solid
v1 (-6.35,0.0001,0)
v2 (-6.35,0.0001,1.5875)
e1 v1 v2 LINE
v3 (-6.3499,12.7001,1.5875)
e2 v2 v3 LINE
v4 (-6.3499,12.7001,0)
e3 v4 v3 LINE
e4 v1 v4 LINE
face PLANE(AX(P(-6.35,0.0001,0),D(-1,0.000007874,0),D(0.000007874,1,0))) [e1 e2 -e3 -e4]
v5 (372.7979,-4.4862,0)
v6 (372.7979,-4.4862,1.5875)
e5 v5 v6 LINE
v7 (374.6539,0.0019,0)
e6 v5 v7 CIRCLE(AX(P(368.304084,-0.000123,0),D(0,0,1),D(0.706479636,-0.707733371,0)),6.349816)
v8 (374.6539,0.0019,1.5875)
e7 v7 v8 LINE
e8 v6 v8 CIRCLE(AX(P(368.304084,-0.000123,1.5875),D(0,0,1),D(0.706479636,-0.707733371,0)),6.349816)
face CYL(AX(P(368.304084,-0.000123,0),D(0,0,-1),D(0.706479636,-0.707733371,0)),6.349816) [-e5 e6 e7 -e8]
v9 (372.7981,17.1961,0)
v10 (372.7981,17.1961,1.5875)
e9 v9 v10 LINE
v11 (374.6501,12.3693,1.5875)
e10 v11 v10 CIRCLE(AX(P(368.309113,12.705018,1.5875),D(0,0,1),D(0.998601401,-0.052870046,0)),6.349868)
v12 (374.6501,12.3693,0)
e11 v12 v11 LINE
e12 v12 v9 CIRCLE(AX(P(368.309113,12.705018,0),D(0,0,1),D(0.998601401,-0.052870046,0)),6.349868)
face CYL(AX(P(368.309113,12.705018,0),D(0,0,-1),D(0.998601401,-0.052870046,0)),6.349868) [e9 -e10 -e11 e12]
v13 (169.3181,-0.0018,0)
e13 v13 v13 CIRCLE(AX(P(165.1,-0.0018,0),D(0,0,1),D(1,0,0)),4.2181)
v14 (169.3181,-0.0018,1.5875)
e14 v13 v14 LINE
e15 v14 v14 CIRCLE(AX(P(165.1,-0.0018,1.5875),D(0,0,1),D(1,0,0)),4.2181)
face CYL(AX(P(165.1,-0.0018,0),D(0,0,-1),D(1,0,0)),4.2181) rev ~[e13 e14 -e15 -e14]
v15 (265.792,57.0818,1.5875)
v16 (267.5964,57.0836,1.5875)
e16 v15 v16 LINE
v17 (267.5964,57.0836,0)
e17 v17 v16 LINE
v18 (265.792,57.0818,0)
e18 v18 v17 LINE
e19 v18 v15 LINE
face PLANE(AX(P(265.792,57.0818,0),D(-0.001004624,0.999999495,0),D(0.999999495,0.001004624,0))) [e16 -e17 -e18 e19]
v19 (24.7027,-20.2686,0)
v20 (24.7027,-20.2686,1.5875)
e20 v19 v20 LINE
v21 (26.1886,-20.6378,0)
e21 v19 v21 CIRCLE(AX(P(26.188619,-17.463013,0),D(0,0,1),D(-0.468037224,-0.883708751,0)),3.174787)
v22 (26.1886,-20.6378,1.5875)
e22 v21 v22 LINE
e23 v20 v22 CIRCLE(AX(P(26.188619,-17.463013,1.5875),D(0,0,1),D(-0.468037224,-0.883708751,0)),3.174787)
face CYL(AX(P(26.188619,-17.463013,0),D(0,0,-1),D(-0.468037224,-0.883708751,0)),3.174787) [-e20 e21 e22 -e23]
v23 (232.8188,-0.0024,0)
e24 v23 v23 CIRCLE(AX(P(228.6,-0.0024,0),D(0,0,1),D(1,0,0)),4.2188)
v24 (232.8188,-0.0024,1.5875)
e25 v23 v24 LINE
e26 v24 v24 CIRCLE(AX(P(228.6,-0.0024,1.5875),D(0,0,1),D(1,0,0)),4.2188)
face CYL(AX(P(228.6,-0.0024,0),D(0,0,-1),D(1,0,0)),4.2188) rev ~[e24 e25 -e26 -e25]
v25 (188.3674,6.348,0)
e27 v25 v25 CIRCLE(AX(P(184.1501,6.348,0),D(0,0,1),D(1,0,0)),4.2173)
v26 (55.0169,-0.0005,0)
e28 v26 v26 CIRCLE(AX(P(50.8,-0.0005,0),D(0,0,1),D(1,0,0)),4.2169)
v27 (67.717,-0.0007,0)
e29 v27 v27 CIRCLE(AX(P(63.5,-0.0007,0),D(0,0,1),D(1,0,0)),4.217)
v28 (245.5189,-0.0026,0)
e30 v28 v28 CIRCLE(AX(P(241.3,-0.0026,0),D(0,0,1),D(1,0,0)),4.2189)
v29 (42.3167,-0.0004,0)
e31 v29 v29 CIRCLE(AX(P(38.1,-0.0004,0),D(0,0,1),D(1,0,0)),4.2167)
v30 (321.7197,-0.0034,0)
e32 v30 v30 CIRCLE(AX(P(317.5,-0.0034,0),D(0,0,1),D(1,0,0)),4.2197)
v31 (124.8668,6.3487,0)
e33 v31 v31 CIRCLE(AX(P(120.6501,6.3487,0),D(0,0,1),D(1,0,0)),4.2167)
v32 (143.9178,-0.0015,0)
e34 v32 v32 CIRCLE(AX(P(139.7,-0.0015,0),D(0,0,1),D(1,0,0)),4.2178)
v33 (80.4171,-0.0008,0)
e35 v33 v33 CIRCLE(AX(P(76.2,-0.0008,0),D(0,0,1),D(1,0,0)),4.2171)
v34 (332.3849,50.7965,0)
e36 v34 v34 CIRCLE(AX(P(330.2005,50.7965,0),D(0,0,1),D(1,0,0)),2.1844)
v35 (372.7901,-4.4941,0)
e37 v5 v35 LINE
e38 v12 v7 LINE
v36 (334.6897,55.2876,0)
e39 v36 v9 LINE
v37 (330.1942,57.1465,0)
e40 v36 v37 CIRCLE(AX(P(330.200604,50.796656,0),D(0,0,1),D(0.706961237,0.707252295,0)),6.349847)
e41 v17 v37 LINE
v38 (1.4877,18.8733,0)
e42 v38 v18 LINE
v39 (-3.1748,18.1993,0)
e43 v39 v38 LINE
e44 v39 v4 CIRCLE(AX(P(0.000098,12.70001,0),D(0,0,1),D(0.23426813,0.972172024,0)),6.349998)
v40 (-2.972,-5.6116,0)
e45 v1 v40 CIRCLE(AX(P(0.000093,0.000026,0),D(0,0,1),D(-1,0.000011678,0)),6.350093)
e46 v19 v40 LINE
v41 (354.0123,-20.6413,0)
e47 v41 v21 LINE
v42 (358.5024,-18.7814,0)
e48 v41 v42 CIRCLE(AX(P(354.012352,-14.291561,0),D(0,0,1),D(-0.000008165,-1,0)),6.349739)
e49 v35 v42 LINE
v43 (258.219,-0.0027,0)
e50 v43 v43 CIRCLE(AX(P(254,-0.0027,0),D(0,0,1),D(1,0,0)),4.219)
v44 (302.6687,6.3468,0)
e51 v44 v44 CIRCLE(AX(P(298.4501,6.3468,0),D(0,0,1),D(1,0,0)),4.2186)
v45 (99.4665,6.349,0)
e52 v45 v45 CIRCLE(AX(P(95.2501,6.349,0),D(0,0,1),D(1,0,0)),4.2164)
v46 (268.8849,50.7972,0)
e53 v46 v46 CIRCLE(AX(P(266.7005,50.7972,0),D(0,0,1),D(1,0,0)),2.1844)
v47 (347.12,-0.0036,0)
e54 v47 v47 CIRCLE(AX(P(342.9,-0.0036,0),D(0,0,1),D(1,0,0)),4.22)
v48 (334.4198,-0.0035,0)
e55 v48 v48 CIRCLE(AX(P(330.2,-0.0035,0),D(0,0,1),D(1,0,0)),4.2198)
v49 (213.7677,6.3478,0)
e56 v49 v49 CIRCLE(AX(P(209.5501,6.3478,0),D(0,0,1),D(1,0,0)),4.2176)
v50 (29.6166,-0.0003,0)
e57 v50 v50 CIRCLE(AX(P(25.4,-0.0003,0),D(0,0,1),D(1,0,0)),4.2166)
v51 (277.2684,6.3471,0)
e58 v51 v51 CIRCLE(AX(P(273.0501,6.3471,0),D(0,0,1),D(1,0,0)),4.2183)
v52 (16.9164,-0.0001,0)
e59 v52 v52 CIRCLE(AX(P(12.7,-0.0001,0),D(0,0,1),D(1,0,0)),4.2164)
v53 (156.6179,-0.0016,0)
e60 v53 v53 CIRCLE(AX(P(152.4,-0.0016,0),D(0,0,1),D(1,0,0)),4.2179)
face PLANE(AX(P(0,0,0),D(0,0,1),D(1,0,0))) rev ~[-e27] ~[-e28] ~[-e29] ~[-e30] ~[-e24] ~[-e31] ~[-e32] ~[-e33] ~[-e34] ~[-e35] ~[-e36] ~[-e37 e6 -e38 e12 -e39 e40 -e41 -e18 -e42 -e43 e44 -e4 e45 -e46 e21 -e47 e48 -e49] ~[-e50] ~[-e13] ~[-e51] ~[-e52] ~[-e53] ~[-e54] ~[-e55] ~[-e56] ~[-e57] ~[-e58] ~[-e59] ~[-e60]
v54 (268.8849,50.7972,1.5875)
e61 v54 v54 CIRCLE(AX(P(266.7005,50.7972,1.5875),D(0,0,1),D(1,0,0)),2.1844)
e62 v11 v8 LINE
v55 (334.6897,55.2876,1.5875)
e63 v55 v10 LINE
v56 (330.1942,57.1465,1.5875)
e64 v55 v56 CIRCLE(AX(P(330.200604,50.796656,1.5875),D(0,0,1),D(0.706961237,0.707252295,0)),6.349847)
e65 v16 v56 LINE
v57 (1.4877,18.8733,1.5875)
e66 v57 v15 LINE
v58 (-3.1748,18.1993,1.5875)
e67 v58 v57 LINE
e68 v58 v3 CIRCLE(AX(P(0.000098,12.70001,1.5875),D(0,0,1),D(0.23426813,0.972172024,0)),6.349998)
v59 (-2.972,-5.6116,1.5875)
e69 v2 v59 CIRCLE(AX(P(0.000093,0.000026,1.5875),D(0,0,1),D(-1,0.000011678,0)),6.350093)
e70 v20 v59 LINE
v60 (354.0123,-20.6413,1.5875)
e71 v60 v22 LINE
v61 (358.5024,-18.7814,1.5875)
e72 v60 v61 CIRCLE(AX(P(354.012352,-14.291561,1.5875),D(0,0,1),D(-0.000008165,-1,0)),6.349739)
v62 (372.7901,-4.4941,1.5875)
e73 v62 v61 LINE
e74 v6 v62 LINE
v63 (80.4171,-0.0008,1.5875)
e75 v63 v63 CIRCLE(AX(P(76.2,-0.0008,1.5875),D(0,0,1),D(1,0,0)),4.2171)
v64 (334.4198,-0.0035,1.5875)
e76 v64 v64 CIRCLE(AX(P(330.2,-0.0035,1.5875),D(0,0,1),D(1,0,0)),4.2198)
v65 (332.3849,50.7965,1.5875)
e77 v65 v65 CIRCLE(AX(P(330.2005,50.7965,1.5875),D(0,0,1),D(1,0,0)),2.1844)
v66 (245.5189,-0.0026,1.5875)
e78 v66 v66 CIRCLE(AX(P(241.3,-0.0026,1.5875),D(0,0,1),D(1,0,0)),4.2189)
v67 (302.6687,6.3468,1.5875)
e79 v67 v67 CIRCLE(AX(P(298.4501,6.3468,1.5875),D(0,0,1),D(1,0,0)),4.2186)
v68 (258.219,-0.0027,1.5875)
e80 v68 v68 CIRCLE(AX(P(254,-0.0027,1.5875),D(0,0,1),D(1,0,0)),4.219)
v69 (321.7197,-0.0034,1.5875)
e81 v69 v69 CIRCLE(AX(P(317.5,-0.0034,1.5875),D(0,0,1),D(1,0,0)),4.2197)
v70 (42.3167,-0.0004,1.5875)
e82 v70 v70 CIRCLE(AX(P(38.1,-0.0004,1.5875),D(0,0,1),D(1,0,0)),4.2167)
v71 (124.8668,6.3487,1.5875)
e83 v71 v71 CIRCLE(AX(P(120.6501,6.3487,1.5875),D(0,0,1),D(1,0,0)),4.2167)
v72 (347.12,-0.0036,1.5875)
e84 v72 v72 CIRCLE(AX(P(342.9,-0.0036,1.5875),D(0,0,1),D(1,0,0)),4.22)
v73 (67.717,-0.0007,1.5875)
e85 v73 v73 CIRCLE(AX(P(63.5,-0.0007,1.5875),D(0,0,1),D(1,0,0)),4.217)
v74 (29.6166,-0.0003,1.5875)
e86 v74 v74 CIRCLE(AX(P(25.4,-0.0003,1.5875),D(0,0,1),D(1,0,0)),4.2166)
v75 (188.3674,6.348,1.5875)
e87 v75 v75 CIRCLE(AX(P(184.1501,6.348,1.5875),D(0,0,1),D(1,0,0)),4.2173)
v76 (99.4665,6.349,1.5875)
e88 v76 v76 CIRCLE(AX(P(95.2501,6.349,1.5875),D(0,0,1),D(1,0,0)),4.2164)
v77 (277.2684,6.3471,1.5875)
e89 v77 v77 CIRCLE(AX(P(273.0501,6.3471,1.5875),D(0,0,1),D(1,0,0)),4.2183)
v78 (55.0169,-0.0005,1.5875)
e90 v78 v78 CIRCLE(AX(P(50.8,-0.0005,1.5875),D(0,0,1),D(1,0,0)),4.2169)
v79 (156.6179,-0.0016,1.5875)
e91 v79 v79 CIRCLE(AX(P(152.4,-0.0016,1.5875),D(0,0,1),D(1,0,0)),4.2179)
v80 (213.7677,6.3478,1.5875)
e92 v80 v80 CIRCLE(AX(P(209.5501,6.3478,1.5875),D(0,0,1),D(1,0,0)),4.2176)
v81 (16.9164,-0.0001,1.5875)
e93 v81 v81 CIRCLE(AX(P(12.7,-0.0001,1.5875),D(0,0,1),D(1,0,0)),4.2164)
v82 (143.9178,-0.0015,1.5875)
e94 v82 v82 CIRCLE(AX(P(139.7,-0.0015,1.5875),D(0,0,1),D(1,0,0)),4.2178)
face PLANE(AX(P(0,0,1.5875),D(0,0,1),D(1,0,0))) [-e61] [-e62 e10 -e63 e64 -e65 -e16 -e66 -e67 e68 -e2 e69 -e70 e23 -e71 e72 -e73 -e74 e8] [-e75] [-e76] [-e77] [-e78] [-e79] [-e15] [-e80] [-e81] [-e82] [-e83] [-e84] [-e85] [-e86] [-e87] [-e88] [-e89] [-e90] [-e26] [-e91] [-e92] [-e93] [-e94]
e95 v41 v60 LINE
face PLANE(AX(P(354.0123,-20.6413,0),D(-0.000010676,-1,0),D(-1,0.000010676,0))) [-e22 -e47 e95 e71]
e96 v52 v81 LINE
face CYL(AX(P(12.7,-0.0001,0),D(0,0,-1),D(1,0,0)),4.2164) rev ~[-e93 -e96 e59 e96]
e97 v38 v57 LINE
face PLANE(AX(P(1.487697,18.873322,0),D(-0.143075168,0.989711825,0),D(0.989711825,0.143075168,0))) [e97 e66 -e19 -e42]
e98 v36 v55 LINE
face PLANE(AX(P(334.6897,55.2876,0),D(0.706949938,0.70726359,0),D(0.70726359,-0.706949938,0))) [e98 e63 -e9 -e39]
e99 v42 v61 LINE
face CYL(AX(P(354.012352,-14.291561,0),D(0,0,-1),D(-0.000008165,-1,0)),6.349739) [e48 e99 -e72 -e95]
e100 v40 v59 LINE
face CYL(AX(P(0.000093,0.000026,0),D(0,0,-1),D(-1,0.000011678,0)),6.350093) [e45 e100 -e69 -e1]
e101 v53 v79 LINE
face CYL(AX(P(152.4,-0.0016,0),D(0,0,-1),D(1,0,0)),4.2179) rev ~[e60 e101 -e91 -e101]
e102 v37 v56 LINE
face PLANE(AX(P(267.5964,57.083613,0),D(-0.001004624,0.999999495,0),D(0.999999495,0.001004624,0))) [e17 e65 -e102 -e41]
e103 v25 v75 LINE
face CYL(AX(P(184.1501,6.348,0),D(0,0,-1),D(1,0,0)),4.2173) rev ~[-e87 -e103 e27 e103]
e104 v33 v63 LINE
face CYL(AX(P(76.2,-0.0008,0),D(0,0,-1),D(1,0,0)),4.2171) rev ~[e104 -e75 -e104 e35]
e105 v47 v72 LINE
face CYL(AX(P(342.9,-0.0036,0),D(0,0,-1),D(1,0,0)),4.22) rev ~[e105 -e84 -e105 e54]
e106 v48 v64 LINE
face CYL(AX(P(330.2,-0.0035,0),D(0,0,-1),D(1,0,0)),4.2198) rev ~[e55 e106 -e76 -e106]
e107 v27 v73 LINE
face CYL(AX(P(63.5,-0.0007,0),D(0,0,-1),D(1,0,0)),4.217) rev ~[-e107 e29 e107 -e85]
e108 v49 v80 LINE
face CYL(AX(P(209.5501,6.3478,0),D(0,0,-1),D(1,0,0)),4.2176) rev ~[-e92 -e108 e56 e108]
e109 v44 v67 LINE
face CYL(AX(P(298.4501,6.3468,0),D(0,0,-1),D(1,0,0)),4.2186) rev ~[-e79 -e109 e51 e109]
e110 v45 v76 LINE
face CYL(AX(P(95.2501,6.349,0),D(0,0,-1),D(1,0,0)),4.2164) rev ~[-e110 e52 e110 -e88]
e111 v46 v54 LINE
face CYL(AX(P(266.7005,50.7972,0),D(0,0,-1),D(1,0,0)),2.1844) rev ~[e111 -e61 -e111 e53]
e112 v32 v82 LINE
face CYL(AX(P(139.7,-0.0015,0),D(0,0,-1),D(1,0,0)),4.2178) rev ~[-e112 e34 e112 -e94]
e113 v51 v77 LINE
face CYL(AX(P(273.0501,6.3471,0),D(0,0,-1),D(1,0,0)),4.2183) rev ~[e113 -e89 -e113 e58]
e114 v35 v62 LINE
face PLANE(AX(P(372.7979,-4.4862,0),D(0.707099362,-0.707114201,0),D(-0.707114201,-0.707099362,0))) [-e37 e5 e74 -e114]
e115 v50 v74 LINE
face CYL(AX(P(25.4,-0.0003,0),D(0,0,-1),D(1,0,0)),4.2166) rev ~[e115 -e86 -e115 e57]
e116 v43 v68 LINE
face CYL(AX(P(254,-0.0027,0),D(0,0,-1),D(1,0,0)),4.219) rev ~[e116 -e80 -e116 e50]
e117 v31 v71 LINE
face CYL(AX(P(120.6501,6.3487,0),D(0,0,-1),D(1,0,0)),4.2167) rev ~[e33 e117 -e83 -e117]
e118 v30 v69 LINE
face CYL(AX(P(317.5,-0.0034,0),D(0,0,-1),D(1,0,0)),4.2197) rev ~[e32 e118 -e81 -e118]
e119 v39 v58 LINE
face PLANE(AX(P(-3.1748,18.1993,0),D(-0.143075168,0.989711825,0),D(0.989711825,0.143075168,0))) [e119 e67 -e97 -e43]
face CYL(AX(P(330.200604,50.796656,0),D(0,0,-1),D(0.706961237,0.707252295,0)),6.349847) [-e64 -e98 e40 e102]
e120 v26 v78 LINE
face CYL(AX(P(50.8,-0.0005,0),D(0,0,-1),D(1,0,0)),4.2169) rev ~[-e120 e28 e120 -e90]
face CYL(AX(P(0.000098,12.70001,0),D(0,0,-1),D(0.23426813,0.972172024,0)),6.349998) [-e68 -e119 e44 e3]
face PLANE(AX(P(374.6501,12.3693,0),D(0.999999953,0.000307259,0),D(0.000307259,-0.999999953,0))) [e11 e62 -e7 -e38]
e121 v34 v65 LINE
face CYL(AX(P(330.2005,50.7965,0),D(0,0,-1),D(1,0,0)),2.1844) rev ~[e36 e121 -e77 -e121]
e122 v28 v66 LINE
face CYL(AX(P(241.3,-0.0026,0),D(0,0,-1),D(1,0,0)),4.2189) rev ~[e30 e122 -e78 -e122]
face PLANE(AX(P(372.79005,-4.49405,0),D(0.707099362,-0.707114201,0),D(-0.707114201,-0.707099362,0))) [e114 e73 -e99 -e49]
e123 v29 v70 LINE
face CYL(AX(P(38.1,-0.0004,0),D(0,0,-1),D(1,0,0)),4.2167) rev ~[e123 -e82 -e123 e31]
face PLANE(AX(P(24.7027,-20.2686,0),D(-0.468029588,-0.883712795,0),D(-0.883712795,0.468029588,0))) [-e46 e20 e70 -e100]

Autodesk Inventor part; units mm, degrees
ref_plane "YZ Plane" through (0, 0, 0) normal (1, 0, 0) x (0, 1, 0)
ref_plane "XZ Plane" through (0, 0, 0) normal (0, 1, 0) x (-1, 0, 0)
ref_plane "XY Plane" through (0, 0, 0) normal (0, 0, 1) x (1, 0, 0)
sketch "main" plane through (0, 0, 0) normal (0, 0, 1) x (1, 0, 0)
  circle A0 centre (-13.3607, 90.7974) radius 2.1844
  circle A1 centre (-19.7107, 109.8474) radius 2.1844
  circle A2 centre (-19.7107, 122.5474) radius 2.1358
  circle A3 centre (-19.7107, 147.9474) radius 2.1844
  circle A4 centre (-19.7107, 135.2474) radius 2.1844
  circle A5 centre (-19.7107, 173.3474) radius 2.1844
  circle A6 centre (-19.7107, 160.6474) radius 2.1844
  circle A7 centre (-13.3607, 65.3974) radius 2.1844
  circle A8 centre (-19.7107, 46.3474) radius 2.1844
  circle A9 centre (-19.7107, 33.6474) radius 2.1844
  circle A10 centre (-19.7107, 20.9474) radius 2.1844 construction
  line L0 (-1.5114, 189.2224) -> (37.374, -79.744)
  line L1 (-40.3482, -167.9651) -> (-40.3482, 159.8585)
  circle A11 centre (-13.3607, 1.8974) radius 2.1844 construction
  circle A12 centre (-13.3607, -23.5026) radius 2.1844 construction
  circle A13 centre (-19.7107, -42.5526) radius 2.1844 construction
  circle A14 centre (-19.7107, -67.9526) radius 2.1844 construction
  circle A15 centre (31.0893, -80.6526) radius 2.1844
  circle A16 centre (-19.7107, -55.2526) radius 2.1844 construction
  circle A17 centre (-13.3607, -87.0026) radius 2.1844 construction
  circle A18 centre (-13.3607, -112.4026) radius 2.1844 construction
  circle A19 centre (-19.7107, -131.4526) radius 2.1844 construction
  circle A20 centre (-19.7107, -144.1526) radius 2.1844 construction
  line L2 (37.374, -79.744) -> (37.4393, -144.1462)
  arc A21 (35.5805, -148.6417) -> (37.4393, -144.1462) centre (31.0893, -144.1526) ccw
  arc A22 (37.3758, -81.5485) -> (37.374, -79.744) centre (31.0893, -80.6526) ccw
  circle A23 centre (-19.7107, -156.8526) radius 2.1844 construction
  arc A24 (-40.3482, -167.9651) -> (-38.4883, -172.4553) centre (-33.9982, -167.9651) ccw
  line L3 (35.5805, -148.6417) -> (-2.5106, -186.7506)
  line L4 (-2.5106, -186.7506) -> (-1.346, -186.7506) construction
  arc A25 (-7.3374, -188.6026) -> (-2.5106, -186.7506) centre (-7.0018, -182.2615) ccw
  line L5 (-24.1929, -186.7506) -> (-38.4883, -172.4553)
  line L6 (-7.3374, -188.6026) -> (-19.7047, -188.6066)
  arc A26 (-24.2008, -186.7428) -> (-19.7047, -188.6066) centre (-19.7067, -182.2566) ccw
  circle A27 centre (31.0893, -144.1526) radius 2.1844
  arc A28 (-19.7107, 192.3974) -> (-25.3223, 189.0193) centre (-19.7107, 186.0474) ccw
  arc A29 (-0.8373, 184.5599) -> (-7.0107, 192.3974) centre (-7.0107, 186.0474) ccw
  arc A30 (-39.979, 161.3445) -> (-40.3482, 159.8585) centre (-37.1732, 159.8585) ccw
  line L7 (-39.979, 161.3445) -> (-25.3223, 189.0193)
  line L8 (-19.7107, 192.3974) -> (-7.0107, 192.3974)
  circle A31 centre (-19.7107, 173.3474) radius 4.2164
  circle A32 centre (-19.7107, 160.6474) radius 4.2166
  circle A33 centre (-19.7107, 147.9474) radius 4.2167
  circle A34 centre (-19.7107, 135.2474) radius 4.2169
  circle A35 centre (-19.7107, 122.5474) radius 4.217
  circle A36 centre (-19.7107, 109.8474) radius 4.2171
  circle A37 centre (-13.3607, 90.7974) radius 4.2164
  circle A38 centre (-13.3607, 65.3974) radius 4.2167
  circle A39 centre (-19.7107, 46.3474) radius 4.2178
  circle A40 centre (-19.7107, 33.6474) radius 4.2179
  circle A41 centre (-19.7107, 20.9474) radius 4.2181
  circle A42 centre (-13.3607, 1.8974) radius 4.2173
  circle A43 centre (-13.3607, -23.5026) radius 4.2176
  circle A44 centre (-19.7107, -42.5526) radius 4.2188
  circle A45 centre (-19.7107, -55.2526) radius 4.2189
  circle A46 centre (-19.7107, -67.9526) radius 4.219
  circle A47 centre (-13.3607, -87.0026) radius 4.2183
  circle A48 centre (-13.3607, -112.4026) radius 4.2186
  circle A49 centre (-19.7107, -131.4526) radius 4.2197
  circle A50 centre (-19.7107, -144.1526) radius 4.2198
  circle A51 centre (-19.7107, -156.8526) radius 4.22
  point P0 (-9.7209, -19.0127)
  dimension "d0" = 135
  dimension "d1" = 135
  dimension "d2" = 6.35
  dimension "d3" = 3.175
  dimension "d4" = 8.4328
  dimension "d5" = 8.4328
sketch "Sketch1" plane through (0, 0, 0) normal (0, 0, 1) x (1, 0, 0)
  circle A0 centre (95.2501, 6.349) radius 2.1844
  circle A1 centre (76.2, -0.0008) radius 2.1844
  circle A2 centre (63.5, -0.0007) radius 2.1358
  circle A3 centre (38.1, -0.0004) radius 2.1844
  circle A4 centre (50.8, -0.0005) radius 2.1844
  circle A5 centre (12.7, -0.0001) radius 2.1844
  circle A6 centre (25.4, -0.0003) radius 2.1844
  circle A7 centre (120.6501, 6.3487) radius 2.1844
  circle A8 centre (139.7, -0.0015) radius 2.1844
  circle A9 centre (152.4, -0.0016) radius 2.1844
  circle A10 centre (165.1, -0.0018) radius 2.1844 construction
  line L0 (-3.1748, 18.1993) -> (265.792, 57.0818)
  line L1 (354.0123, -20.6413) -> (26.1886, -20.6378)
  circle A11 centre (184.1501, 6.348) radius 2.1844 construction
  circle A12 centre (209.5501, 6.3478) radius 2.1844 construction
  circle A13 centre (228.6, -0.0024) radius 2.1844 construction
  circle A14 centre (254, -0.0027) radius 2.1844 construction
  circle A15 centre (266.7005, 50.7972) radius 2.1844
  circle A16 centre (241.3, -0.0026) radius 2.1844 construction
  circle A17 centre (273.0501, 6.3471) radius 2.1844 construction
  circle A18 centre (298.4501, 6.3468) radius 2.1844 construction
  circle A19 centre (317.5, -0.0034) radius 2.1844 construction
  circle A20 centre (330.2, -0.0035) radius 2.1844 construction
  line L2 (265.792, 57.0818) -> (330.1942, 57.1465)
  arc A21 (334.6897, 55.2876) -> (330.1942, 57.1465) centre (330.2005, 50.7965) ccw
  arc A22 (267.5964, 57.0836) -> (265.792, 57.0818) centre (266.7005, 50.7972) ccw
  circle A23 centre (342.9, -0.0036) radius 2.1844 construction
  arc A24 (354.0123, -20.6413) -> (358.5024, -18.7814) centre (354.0123, -14.2913) ccw
  line L3 (334.6897, 55.2876) -> (372.7981, 17.1961)
  line L4 (372.7981, 17.1961) -> (372.7982, 18.3607) construction
  arc A25 (374.6501, 12.3693) -> (372.7981, 17.1961) centre (368.309, 12.705) ccw
  line L5 (372.7979, -4.4862) -> (358.5024, -18.7814)
  line L6 (374.6501, 12.3693) -> (374.6539, 0.0019)
  arc A26 (372.7901, -4.4941) -> (374.6539, 0.0019) centre (368.3039, 0) ccw
  circle A27 centre (330.2005, 50.7965) radius 2.1844
  arc A28 (-6.35, 0.0001) -> (-2.972, -5.6116) centre (0, 0) ccw
  arc A29 (1.4877, 18.8733) -> (-6.3499, 12.7001) centre (0.0001, 12.7) ccw
  arc A30 (24.7027, -20.2686) -> (26.1886, -20.6378) centre (26.1887, -17.4628) ccw
  line L7 (24.7027, -20.2686) -> (-2.972, -5.6116)
  line L8 (-6.35, 0.0001) -> (-6.3499, 12.7001)
  circle A31 centre (12.7, -0.0001) radius 4.2164
  circle A32 centre (25.4, -0.0003) radius 4.2166
  circle A33 centre (38.1, -0.0004) radius 4.2167
  circle A34 centre (50.8, -0.0005) radius 4.2169
  circle A35 centre (63.5, -0.0007) radius 4.217
  circle A36 centre (76.2, -0.0008) radius 4.2171
  circle A37 centre (95.2501, 6.349) radius 4.2164
  circle A38 centre (120.6501, 6.3487) radius 4.2167
  circle A39 centre (139.7, -0.0015) radius 4.2178
  circle A40 centre (152.4, -0.0016) radius 4.2179
  circle A41 centre (165.1, -0.0018) radius 4.2181
  circle A42 centre (184.1501, 6.348) radius 4.2173
  circle A43 centre (209.5501, 6.3478) radius 4.2176
  circle A44 centre (228.6, -0.0024) radius 4.2188
  circle A45 centre (241.3, -0.0026) radius 4.2189
  circle A46 centre (254, -0.0027) radius 4.219
  circle A47 centre (273.0501, 6.3471) radius 4.2183
  circle A48 centre (298.4501, 6.3468) radius 4.2186
  circle A49 centre (317.5, -0.0034) radius 4.2197
  circle A50 centre (330.2, -0.0035) radius 4.2198
  circle A51 centre (342.9, -0.0036) radius 4.22
  point P0 (0, 0)
extrude "Extrusion1" add sketch "Sketch1" along normal blind 1.5875 contours L0 L2 A21 L3 A25 L6 A26 L5 A24 L1 A30 L7 A28 L8 A29
properties part number "skirt" material "Acetal Resin, White"
